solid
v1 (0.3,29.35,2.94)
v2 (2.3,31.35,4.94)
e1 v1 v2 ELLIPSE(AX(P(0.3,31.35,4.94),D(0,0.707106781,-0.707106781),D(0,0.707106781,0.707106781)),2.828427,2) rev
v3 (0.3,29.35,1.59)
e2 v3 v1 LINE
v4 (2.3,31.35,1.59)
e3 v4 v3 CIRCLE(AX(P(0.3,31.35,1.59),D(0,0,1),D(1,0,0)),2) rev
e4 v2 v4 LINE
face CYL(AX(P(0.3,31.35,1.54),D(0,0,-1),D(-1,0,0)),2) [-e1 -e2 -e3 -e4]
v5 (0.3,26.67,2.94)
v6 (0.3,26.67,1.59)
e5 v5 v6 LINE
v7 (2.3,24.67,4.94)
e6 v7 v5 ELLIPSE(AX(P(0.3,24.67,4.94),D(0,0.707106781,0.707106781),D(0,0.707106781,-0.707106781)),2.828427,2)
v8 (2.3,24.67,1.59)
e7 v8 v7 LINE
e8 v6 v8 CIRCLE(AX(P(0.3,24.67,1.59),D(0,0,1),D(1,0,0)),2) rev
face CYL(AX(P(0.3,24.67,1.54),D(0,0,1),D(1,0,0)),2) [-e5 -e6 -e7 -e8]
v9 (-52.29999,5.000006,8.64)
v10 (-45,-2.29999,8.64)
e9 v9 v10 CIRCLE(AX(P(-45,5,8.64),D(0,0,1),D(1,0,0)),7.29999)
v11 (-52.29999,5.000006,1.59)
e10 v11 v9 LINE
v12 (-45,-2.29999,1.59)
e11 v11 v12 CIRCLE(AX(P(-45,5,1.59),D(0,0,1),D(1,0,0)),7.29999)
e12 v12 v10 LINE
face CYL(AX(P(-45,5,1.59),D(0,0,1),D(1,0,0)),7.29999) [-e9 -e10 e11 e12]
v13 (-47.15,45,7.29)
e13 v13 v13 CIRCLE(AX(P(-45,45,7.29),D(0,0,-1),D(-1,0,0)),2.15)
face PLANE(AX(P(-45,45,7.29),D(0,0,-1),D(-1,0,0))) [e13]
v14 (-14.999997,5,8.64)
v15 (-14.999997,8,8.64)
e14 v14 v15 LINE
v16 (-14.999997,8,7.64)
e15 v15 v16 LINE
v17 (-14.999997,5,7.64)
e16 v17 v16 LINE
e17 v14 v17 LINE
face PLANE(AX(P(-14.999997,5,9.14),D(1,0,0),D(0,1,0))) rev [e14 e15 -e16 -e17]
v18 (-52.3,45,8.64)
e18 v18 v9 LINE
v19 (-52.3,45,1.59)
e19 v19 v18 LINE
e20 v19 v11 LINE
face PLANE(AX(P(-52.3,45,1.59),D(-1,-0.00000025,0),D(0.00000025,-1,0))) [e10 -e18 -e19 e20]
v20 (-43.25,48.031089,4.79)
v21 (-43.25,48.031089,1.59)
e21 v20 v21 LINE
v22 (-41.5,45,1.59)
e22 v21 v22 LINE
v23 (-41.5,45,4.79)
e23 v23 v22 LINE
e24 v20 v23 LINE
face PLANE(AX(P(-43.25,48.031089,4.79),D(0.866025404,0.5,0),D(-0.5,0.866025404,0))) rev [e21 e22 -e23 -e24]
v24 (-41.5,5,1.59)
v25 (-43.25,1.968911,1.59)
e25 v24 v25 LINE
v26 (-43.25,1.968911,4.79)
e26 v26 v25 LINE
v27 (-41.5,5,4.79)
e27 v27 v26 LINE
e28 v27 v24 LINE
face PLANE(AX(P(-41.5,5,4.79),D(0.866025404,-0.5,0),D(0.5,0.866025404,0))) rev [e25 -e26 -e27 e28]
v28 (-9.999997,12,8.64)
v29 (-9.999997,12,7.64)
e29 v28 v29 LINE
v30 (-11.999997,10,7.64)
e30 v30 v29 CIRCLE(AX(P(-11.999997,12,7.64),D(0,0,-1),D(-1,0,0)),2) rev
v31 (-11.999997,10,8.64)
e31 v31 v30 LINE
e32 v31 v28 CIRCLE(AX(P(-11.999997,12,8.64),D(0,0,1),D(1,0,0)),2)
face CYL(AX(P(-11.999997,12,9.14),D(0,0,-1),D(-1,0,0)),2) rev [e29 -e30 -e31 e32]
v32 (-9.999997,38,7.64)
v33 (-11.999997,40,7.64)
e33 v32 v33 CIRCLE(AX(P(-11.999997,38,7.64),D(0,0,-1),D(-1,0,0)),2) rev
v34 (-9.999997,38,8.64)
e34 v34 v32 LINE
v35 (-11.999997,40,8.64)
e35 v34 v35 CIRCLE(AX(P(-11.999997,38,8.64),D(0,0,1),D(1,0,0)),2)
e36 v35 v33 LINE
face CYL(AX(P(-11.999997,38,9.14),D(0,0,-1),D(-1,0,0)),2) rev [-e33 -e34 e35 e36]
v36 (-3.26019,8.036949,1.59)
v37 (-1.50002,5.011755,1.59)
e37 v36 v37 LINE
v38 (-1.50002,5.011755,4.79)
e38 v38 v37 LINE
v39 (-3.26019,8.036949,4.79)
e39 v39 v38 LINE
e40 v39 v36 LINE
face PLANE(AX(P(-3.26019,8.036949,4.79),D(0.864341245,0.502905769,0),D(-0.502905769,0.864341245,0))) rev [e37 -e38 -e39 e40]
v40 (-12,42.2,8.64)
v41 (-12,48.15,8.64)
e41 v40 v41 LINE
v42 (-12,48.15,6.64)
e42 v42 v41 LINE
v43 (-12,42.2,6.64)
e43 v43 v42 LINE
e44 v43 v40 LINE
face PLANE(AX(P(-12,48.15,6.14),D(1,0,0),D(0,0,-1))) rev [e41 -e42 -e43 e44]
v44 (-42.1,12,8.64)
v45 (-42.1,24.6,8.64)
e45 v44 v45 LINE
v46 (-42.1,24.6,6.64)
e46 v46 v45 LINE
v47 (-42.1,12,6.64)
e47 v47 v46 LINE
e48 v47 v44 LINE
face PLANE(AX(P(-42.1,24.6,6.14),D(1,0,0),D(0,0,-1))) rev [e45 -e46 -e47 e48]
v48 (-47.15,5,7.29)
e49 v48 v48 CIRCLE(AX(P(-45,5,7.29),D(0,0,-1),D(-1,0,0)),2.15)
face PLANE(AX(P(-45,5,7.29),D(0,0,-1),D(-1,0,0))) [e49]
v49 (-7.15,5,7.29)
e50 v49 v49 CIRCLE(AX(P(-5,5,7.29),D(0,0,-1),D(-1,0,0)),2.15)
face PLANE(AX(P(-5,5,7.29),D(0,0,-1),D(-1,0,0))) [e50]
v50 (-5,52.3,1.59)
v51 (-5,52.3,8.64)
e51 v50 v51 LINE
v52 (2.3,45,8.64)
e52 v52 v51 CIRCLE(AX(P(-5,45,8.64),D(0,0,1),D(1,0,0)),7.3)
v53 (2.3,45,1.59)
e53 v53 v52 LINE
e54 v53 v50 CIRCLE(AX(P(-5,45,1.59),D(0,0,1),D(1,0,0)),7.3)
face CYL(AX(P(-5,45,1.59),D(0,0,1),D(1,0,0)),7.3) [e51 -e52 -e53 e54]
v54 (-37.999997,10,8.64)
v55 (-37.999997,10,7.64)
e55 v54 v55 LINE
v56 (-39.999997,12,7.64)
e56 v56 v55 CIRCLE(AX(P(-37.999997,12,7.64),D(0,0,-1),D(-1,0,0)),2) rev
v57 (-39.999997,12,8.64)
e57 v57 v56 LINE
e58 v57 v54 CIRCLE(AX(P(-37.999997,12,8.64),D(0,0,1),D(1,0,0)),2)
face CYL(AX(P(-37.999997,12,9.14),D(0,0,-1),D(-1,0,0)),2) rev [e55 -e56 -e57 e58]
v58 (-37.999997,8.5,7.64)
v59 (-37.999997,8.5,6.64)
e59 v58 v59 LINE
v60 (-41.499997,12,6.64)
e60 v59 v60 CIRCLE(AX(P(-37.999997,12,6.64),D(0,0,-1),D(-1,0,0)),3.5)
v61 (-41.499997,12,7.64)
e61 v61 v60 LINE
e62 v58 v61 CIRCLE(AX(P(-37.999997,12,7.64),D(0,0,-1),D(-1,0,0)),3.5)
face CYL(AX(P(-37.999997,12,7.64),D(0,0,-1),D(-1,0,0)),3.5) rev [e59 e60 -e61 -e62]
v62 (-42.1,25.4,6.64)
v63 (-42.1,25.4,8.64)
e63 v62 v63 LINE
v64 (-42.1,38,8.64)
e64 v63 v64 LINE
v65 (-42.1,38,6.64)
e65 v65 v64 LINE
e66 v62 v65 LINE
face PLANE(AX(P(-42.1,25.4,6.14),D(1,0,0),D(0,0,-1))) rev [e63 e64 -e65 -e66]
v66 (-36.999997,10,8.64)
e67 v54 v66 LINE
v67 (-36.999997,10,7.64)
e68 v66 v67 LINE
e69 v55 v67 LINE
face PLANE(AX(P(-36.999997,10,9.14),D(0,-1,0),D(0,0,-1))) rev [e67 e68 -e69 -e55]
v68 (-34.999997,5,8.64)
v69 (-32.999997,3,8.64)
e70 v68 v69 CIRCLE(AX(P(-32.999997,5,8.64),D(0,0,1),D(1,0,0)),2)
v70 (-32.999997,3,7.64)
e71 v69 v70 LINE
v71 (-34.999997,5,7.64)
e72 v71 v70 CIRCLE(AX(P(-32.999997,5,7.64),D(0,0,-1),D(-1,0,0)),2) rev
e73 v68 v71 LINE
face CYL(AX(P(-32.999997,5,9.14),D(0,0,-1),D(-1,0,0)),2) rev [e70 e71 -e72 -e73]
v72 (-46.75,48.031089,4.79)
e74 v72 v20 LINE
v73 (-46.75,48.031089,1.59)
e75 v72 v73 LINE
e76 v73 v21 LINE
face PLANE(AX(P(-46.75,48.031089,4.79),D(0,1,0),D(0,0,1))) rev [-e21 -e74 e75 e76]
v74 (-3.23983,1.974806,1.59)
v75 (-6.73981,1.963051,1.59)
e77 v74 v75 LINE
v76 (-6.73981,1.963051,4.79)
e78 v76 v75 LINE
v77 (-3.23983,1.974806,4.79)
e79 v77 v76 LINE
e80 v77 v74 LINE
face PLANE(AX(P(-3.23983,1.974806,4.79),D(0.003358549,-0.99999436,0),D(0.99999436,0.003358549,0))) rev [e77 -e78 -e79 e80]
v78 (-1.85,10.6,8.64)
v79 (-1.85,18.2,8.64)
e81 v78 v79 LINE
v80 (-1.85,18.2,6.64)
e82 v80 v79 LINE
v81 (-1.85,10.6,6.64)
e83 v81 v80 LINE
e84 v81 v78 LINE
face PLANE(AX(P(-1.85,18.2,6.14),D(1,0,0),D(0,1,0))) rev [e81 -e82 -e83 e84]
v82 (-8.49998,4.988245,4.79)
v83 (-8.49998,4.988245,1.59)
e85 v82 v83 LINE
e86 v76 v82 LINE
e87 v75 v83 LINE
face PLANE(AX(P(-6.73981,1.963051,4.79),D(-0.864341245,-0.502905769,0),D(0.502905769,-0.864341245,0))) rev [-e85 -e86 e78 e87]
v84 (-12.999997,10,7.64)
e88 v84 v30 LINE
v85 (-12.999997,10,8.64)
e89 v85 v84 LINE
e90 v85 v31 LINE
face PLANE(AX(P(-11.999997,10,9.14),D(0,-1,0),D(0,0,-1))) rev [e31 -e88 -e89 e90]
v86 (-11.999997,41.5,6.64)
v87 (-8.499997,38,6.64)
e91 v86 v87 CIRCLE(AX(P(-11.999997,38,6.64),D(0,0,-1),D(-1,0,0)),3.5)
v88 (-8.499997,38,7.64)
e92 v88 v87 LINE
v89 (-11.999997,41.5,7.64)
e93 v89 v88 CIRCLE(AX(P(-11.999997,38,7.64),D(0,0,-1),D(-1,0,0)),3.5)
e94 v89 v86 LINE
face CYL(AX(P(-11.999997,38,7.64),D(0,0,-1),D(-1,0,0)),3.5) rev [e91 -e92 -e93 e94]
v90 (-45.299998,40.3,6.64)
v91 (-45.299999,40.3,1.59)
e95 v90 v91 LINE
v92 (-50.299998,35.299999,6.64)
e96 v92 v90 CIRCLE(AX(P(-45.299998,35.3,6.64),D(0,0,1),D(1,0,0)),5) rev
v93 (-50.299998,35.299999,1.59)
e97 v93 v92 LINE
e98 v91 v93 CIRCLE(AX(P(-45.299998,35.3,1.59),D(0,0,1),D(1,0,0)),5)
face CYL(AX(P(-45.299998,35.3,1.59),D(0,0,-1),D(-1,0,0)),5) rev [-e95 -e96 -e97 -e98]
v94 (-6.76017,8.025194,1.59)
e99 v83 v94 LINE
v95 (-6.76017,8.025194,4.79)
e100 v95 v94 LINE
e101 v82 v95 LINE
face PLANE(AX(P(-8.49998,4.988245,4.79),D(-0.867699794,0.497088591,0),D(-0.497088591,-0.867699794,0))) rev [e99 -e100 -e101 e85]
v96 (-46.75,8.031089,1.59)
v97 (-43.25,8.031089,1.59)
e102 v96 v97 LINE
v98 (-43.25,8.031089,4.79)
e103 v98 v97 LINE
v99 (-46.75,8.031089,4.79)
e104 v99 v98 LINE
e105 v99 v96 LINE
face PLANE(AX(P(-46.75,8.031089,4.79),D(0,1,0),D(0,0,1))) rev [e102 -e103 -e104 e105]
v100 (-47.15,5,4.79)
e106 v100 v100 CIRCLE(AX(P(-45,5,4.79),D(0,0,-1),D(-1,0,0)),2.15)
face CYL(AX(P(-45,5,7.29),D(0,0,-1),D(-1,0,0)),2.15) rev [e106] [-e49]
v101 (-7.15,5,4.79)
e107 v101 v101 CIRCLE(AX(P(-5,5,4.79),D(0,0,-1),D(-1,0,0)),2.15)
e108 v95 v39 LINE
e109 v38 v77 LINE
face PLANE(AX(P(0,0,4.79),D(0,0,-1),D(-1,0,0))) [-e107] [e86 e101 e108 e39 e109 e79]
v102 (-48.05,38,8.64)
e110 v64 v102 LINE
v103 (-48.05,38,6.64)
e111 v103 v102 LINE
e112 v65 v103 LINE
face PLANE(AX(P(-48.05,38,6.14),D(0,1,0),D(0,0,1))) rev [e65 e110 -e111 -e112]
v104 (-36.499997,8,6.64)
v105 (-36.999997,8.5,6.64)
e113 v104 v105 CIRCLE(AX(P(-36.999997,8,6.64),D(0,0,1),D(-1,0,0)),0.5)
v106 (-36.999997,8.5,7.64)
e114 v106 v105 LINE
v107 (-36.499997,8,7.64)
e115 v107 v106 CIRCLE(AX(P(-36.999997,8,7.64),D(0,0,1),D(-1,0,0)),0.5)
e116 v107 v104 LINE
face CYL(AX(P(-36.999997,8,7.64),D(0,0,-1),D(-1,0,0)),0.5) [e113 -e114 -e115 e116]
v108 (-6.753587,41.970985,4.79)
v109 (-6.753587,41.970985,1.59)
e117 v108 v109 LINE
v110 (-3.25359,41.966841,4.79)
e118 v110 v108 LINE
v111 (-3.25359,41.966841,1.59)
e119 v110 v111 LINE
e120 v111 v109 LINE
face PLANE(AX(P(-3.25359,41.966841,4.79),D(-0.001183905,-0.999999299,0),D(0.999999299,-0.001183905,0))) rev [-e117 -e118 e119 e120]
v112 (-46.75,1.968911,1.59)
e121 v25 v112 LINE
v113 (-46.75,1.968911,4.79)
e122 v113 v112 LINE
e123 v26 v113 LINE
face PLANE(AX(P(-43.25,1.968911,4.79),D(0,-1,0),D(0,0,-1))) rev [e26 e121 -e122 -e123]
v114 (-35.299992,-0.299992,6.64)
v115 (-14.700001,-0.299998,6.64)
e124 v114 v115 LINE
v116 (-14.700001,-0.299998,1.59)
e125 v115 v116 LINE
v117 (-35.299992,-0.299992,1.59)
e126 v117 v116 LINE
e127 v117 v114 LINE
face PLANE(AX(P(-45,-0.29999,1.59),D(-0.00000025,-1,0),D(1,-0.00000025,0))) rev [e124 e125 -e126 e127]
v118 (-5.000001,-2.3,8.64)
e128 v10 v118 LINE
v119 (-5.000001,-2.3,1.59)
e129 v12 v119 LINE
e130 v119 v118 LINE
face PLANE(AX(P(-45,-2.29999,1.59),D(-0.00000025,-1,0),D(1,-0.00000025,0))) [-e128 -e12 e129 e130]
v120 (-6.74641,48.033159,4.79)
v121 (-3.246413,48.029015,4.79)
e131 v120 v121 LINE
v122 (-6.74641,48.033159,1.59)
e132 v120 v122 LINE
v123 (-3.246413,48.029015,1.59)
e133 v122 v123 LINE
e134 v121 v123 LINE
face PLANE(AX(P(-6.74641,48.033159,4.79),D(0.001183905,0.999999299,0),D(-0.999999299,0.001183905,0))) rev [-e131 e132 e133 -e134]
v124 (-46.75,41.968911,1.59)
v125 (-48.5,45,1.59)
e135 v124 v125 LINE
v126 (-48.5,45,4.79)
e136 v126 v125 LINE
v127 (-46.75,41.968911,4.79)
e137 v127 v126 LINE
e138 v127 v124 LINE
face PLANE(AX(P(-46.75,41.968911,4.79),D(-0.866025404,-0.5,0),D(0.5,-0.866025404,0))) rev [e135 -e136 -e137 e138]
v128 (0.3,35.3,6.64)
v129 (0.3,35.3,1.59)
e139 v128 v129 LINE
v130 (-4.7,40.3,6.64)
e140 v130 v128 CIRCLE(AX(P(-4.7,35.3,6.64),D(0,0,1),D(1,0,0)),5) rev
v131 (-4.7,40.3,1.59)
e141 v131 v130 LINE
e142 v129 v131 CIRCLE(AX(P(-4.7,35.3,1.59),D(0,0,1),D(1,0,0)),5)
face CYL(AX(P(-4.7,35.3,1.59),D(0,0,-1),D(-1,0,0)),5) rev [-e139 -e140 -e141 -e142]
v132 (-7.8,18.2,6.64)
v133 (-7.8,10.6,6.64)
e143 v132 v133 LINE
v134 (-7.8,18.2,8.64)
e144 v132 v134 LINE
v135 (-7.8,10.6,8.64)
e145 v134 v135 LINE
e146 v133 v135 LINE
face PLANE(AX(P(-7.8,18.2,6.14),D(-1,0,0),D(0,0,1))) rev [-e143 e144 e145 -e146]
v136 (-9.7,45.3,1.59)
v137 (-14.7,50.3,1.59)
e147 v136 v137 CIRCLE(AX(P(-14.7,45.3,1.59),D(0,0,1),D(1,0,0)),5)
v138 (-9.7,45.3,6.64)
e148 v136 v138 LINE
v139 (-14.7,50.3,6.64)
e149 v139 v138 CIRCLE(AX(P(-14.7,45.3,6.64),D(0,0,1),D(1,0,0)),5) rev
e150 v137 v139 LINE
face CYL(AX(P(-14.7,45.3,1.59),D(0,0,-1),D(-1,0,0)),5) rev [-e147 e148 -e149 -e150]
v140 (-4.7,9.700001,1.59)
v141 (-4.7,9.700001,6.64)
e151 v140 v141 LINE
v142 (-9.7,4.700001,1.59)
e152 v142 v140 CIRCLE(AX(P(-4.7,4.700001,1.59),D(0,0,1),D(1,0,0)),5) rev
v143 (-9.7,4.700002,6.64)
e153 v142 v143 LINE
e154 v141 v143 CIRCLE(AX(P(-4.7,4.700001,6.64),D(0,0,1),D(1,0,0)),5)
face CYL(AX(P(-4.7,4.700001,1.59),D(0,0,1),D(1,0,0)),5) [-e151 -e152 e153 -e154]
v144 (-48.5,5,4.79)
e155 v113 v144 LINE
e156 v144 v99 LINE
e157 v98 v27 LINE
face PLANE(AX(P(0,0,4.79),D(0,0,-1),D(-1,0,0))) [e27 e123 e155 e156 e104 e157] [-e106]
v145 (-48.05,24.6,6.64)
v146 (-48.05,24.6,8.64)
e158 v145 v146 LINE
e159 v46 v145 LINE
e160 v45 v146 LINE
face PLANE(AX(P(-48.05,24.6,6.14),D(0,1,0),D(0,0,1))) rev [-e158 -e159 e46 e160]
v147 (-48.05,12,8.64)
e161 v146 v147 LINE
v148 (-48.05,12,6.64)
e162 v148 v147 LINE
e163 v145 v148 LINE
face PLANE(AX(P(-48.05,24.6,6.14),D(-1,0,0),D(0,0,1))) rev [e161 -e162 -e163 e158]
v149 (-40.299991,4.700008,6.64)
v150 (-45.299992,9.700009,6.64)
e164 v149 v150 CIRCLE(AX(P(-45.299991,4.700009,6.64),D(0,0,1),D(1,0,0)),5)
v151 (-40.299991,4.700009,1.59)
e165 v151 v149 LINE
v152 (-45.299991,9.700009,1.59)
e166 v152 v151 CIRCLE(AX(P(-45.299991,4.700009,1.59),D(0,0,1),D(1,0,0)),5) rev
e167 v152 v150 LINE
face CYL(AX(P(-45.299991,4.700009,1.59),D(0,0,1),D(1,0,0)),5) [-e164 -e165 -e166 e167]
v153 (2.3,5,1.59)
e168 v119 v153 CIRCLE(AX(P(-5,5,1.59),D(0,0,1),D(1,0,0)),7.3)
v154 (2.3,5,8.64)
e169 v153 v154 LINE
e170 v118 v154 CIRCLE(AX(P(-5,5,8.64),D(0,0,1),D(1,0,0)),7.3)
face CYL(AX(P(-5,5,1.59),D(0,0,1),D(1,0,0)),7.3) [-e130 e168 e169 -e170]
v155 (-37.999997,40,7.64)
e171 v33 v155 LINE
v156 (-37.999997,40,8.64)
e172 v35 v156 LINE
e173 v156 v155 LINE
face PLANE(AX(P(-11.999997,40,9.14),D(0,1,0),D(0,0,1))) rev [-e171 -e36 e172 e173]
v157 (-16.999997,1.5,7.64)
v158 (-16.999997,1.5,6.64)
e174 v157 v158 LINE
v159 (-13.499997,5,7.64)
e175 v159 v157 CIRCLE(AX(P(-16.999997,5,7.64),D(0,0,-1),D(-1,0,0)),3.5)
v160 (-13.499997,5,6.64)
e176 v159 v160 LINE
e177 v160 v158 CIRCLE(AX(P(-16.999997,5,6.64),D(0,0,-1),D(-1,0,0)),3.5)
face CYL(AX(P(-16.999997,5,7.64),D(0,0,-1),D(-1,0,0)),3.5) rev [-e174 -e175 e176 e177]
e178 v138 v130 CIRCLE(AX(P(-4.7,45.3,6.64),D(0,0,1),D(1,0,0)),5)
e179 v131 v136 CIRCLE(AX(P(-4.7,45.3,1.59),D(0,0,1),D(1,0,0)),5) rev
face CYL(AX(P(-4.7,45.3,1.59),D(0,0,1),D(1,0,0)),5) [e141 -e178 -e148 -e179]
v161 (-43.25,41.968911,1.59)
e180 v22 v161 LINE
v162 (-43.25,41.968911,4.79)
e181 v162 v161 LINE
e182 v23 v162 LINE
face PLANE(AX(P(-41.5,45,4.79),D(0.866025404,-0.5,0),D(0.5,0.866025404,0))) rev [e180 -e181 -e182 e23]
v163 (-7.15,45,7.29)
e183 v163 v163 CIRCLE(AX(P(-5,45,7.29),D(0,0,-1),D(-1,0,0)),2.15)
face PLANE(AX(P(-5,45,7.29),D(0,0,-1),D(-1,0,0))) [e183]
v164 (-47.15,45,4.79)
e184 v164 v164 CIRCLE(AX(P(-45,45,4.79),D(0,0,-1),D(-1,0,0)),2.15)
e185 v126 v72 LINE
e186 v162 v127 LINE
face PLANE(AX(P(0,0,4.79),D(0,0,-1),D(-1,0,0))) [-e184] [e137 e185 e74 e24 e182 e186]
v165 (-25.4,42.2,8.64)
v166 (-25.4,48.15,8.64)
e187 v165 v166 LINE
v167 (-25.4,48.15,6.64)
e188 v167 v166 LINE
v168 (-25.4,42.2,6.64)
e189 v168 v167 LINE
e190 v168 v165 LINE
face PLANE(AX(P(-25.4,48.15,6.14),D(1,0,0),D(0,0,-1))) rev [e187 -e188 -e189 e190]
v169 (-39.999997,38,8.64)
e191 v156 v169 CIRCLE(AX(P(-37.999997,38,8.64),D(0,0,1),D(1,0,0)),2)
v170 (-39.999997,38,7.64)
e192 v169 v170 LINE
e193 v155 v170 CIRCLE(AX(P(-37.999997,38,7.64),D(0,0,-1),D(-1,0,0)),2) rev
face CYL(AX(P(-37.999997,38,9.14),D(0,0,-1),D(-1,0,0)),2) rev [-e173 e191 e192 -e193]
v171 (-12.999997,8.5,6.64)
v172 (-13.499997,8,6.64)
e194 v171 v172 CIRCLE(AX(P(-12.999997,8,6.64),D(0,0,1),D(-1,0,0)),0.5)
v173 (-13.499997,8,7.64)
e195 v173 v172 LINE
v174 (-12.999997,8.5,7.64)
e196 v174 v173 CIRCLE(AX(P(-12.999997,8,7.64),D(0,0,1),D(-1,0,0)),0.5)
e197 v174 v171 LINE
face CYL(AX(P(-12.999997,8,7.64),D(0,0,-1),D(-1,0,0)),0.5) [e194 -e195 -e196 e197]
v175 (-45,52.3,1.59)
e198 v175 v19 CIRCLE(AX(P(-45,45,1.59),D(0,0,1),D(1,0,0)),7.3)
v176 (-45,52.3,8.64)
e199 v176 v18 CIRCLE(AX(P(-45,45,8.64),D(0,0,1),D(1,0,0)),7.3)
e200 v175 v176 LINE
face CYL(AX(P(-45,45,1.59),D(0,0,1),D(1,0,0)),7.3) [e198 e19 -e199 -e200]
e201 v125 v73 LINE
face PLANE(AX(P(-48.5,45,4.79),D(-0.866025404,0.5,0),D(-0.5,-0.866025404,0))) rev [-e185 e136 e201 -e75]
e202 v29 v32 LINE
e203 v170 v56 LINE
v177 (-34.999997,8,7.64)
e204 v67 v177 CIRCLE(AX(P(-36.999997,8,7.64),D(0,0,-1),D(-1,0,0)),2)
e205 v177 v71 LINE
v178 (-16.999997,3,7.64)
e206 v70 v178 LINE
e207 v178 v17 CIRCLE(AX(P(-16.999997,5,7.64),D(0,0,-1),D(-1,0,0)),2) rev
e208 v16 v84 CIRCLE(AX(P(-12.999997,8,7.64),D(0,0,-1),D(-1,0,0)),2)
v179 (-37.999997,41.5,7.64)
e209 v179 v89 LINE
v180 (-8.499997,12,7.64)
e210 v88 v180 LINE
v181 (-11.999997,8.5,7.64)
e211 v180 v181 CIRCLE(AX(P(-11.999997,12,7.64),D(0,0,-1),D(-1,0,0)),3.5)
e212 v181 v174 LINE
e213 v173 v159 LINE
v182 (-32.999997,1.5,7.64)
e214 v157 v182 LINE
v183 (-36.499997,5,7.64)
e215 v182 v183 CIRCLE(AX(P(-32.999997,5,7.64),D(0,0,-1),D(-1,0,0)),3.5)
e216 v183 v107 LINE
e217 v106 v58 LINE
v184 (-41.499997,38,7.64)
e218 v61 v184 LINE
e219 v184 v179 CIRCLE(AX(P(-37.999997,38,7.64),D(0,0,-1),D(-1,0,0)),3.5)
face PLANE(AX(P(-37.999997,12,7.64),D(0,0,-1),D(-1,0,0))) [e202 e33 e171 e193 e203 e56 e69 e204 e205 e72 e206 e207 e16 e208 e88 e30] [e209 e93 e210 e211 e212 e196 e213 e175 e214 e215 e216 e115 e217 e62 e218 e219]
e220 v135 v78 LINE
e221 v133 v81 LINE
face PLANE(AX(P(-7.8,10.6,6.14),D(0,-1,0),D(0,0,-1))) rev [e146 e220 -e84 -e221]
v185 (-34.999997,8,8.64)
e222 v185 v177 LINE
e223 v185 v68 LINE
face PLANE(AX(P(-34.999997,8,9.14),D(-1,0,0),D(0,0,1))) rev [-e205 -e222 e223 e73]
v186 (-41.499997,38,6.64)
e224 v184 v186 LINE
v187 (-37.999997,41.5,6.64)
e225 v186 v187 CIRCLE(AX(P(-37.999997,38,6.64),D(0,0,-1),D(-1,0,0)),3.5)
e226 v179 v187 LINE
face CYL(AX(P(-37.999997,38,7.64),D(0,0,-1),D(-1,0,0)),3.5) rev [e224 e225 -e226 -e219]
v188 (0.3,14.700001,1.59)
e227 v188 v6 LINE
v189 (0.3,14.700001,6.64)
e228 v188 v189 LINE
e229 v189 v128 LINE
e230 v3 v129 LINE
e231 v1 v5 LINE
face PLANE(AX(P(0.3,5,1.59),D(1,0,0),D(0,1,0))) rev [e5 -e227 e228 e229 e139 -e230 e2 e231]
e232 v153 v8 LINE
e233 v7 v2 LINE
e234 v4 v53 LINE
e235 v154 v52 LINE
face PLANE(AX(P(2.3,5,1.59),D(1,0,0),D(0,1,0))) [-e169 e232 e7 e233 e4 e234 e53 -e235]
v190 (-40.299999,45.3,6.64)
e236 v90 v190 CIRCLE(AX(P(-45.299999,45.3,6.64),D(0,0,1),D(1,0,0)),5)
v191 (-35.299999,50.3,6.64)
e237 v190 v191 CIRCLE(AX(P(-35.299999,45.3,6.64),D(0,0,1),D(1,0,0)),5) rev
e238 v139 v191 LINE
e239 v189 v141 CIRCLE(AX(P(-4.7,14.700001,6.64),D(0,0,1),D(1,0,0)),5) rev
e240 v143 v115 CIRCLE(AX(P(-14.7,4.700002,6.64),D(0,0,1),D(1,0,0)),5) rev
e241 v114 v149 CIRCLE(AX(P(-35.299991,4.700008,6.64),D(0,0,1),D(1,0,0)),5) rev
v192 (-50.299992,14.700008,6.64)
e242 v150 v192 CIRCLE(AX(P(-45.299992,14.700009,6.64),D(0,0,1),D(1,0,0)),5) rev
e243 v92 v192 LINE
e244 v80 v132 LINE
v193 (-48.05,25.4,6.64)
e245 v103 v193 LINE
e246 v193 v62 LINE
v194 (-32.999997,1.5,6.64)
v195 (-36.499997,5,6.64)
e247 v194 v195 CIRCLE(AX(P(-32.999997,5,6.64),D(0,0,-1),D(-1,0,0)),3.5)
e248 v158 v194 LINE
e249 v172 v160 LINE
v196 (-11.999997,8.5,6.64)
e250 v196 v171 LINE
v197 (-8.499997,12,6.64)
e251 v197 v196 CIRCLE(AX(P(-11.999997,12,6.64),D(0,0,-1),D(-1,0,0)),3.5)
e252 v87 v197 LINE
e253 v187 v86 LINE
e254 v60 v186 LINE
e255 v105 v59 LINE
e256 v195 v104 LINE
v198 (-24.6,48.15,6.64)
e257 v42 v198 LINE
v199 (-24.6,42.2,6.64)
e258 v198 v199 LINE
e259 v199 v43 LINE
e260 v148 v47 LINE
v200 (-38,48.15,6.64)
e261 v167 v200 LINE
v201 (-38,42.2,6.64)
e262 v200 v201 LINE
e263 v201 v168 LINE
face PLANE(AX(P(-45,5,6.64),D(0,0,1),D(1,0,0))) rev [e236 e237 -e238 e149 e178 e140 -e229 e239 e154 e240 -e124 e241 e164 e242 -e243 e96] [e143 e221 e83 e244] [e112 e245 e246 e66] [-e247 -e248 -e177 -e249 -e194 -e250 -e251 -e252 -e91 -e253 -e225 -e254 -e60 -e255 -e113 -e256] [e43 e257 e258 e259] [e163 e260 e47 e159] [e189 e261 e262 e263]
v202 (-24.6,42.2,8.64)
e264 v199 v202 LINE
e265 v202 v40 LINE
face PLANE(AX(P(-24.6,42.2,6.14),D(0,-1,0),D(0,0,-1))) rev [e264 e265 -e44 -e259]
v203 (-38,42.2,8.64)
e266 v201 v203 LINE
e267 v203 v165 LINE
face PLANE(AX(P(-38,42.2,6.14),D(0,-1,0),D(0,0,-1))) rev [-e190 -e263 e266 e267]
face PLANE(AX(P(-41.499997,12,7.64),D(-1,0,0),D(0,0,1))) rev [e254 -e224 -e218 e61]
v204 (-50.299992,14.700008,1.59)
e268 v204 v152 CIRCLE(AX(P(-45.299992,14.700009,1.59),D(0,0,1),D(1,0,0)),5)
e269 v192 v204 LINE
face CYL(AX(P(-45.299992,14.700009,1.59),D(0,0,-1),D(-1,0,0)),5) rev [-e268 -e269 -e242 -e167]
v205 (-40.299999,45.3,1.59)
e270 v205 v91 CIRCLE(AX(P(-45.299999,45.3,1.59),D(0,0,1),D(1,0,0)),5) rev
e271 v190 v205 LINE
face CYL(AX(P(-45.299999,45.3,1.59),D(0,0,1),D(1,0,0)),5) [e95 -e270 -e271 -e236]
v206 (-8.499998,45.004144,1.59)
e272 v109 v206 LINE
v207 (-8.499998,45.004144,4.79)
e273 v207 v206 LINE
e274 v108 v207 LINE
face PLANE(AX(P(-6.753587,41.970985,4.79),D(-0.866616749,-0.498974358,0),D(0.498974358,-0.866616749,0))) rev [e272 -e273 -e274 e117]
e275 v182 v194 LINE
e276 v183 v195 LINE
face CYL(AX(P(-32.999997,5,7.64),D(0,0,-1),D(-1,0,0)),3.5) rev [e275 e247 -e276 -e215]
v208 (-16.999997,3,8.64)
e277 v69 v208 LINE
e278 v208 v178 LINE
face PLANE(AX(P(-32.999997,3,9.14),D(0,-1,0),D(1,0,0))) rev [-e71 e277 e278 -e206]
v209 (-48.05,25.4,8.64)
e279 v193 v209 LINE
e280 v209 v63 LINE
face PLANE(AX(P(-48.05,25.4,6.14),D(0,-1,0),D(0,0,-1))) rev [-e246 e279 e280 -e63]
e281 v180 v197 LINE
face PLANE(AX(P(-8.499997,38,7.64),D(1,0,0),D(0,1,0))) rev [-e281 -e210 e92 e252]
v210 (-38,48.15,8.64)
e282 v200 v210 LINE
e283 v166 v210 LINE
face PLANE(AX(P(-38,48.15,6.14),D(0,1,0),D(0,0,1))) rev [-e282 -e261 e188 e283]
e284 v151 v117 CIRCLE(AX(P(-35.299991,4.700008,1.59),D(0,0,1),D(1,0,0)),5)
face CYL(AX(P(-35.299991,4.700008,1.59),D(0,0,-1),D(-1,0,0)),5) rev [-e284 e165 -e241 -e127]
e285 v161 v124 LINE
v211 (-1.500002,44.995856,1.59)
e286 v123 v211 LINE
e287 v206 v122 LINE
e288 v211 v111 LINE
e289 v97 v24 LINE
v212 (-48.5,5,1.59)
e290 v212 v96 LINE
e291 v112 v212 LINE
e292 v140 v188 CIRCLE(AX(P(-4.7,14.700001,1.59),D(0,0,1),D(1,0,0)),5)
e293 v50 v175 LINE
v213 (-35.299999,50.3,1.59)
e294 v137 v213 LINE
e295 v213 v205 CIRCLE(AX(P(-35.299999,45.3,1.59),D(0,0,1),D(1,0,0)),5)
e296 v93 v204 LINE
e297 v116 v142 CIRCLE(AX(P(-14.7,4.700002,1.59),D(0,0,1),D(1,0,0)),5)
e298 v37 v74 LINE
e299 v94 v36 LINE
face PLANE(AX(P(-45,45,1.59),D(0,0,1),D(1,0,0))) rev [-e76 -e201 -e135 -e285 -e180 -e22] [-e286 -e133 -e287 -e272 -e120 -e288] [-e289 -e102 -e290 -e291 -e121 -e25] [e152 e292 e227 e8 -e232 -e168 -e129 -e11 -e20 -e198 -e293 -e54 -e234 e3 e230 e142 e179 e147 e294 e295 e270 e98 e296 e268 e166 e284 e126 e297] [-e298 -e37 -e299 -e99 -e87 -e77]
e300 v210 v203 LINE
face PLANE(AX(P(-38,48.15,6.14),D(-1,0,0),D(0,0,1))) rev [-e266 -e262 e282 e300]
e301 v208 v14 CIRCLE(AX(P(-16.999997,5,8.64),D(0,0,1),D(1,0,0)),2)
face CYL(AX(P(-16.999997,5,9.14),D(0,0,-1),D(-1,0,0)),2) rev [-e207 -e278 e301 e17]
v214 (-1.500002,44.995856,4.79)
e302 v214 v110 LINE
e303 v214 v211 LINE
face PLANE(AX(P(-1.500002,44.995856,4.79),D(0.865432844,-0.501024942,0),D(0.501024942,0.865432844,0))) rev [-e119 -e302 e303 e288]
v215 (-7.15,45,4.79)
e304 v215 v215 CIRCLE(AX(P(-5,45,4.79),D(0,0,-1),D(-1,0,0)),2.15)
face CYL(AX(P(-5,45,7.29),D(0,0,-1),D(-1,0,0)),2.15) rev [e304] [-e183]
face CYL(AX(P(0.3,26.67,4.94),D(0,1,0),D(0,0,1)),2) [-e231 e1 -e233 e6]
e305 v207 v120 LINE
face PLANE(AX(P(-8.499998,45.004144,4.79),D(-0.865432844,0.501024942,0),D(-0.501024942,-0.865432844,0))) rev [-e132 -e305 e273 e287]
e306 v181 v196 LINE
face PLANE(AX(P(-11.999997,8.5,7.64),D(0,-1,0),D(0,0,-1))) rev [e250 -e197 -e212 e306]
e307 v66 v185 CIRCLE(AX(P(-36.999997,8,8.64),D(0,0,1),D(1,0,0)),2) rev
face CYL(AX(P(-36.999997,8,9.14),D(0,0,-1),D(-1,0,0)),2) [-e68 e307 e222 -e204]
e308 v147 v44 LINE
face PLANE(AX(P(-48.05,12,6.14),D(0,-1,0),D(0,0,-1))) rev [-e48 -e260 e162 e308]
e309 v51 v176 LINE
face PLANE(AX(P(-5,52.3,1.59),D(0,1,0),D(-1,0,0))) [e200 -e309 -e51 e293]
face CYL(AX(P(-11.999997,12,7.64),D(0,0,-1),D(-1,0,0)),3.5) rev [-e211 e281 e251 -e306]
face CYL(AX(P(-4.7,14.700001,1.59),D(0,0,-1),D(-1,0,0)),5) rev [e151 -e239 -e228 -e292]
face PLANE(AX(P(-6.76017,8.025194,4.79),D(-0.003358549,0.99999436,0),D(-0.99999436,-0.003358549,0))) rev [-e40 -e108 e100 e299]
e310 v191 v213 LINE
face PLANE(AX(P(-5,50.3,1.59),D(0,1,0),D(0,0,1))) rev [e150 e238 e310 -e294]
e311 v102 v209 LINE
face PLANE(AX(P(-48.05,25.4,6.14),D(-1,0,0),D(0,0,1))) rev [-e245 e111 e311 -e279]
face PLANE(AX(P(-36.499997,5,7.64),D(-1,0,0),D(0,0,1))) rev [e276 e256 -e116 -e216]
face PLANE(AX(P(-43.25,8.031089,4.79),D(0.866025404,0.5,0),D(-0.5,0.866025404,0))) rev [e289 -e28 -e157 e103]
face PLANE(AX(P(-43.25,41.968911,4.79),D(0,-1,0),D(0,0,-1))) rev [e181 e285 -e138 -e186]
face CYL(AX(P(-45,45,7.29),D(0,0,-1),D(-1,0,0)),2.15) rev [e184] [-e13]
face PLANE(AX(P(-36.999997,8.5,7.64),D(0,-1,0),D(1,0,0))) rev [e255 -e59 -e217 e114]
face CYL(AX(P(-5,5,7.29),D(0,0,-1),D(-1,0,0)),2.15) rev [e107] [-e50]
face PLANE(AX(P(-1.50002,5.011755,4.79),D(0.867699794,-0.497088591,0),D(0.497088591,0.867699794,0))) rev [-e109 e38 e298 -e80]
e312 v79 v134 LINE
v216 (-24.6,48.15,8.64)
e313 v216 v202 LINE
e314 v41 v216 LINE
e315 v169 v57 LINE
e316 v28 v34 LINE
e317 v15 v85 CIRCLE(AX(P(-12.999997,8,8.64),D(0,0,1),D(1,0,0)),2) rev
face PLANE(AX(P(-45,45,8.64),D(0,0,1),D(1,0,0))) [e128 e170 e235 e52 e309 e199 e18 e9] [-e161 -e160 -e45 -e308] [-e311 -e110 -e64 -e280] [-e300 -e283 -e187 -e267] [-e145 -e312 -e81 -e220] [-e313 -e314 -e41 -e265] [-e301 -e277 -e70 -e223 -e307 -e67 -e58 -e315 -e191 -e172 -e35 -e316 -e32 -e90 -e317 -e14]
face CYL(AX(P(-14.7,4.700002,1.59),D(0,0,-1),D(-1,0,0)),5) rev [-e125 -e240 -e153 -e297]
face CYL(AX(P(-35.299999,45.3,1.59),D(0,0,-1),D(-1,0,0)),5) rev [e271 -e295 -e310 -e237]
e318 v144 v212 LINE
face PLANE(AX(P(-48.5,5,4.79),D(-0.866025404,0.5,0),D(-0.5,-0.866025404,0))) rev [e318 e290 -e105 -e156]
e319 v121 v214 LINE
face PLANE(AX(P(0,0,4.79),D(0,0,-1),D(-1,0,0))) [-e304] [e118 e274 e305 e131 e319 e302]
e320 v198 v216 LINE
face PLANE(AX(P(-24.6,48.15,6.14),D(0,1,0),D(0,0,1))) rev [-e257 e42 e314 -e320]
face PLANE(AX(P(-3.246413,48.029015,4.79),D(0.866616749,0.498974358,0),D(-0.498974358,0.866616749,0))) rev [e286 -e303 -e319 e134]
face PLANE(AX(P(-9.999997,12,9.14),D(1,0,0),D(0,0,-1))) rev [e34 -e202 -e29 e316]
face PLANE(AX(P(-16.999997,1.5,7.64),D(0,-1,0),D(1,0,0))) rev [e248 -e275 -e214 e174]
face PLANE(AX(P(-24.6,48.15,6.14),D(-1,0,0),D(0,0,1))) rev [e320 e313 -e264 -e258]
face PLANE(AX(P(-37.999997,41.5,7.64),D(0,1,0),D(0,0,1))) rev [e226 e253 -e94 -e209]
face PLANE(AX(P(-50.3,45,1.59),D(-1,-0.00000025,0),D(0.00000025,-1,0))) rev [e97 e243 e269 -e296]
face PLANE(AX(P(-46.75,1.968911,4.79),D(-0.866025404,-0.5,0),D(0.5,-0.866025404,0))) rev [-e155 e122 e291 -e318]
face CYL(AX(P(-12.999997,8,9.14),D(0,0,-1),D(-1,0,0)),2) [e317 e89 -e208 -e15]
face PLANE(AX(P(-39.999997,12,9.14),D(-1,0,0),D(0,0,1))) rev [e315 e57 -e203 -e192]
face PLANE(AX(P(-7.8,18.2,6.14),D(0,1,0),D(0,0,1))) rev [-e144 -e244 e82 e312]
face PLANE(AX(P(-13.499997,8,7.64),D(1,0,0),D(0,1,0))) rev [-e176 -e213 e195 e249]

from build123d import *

# Parameters (mm, degrees)
WALL_EXTRUDE_BOSS_START          = 8.64
WALL_EXTRUDE_BOSS_DEPTH          = 7.05
CEILING_EXTRUDE_BOSS_DEPTH       = 2
SCREWS_BLOCKS_EXTRUDE_BOSS_DEPTH = 5.05
SCREWS_BLOCKS_FILLET_R           = 5
NUTS_EXTRUDE_DEPTH               = 3.2
SCREWS_SKETCH_R                  = 2.15
SCREWS_HOOLES_EXTRUDE_DEPTH      = 2.5
CONNECTORS_SKETCH_W              = 12.6
CONNECTORS_SKETCH_H              = 5.95
CONNECTORS_SKETCH_W_2            = 5.95
CONNECTORS_SKETCH_H_2            = 12.6
CONNECTORS_SKETCH_H_3            = 7.6
CONNECTORS_EXTRUDE_DEPTH         = 2.5
SWITCH_SKETCH_W                  = 1.4
SWITCH_SKETCH_H                  = 2.68
SWITCH_EXTRUDE_DEPTH             = 2.5
SWITCH_FILLET_R                  = 2
GLASS_EXTRUDE_DEPTH              = 2.5
GLASS_FIT_EXTRUDE_DEPTH          = 1


with BuildPart() as part:
    # Wall_Sketch → Wall_Extrude_Boss (new body)
    with BuildSketch(Plane.XY.offset(WALL_EXTRUDE_BOSS_START)):
        with BuildLine():
            Line((-52.3, 44.999999897), (-52.29999, 5.00000605))
            ThreePointArc((-52.29999, 5.00000605), (-50.161874571, -0.161870293), (-45, -2.29999))
            Line((-45, -2.29999), (-5.000000575, -2.3))
            ThreePointArc((-5.000000575, -2.3), (0.161879299, -0.161879706), (2.3, 5))
            Line((2.3, 5), (2.3, 45))
            ThreePointArc((2.3, 45), (0.161879503, 50.161879503), (-5, 52.3))
            Line((-5, 52.3), (-45, 52.3))
            ThreePointArc((-45, 52.3), (-50.161879539, 50.161879466), (-52.3, 44.999999897))
        make_face()
        with BuildLine():
            Line((-5, 50.3), (-45, 50.3))
            ThreePointArc((-45, 50.3), (-48.747665967, 48.747665914), (-50.3, 44.999999925))
            Line((-50.3, 44.999999925), (-50.29999, 5.00000655))
            ThreePointArc((-50.29999, 5.00000655), (-48.747661185, 1.252343447), (-45, -0.29999))
            Line((-45, -0.29999), (-5.000000075, -0.3))
            ThreePointArc((-5.000000075, -0.3), (-1.252334086, 1.252334033), (0.3, 5))
            Line((0.3, 5), (0.3, 45))
            ThreePointArc((0.3, 45), (-1.25233406, 48.74766594), (-5, 50.3))
        make_face(mode=Mode.SUBTRACT)
    extrude(amount=-WALL_EXTRUDE_BOSS_DEPTH)

    # Ceiling_Sketch → Ceiling_Extrude_Boss (add)
    with BuildSketch(Plane.XY.offset(8.64)):
        with BuildLine():
            Line((-45, -0.29999), (-5.000000075, -0.3))
            ThreePointArc((-5.000000075, -0.3), (-1.252334086, 1.252334033), (0.3, 5))
            Line((0.3, 5), (0.3, 45))
            ThreePointArc((0.3, 45), (-1.25233406, 48.74766594), (-5, 50.3))
            Line((-5, 50.3), (-45, 50.3))
            ThreePointArc((-45, 50.3), (-48.747665967, 48.747665914), (-50.3, 44.999999925))
            Line((-50.3, 44.999999925), (-50.29999, 5.00000655))
            ThreePointArc((-50.29999, 5.00000655), (-48.747661185, 1.252343447), (-45, -0.29999))
        make_face()
    extrude(amount=-CEILING_EXTRUDE_BOSS_DEPTH)


with BuildPart() as screws_blocks_extrude_boss_tool:
    # Screws_Blocks_Sketch → Screws_Blocks_Extrude_Boss (new body)
    with BuildSketch(Plane(origin=(0, 0, 6.64), x_dir=(-1, 0, 0), z_dir=(0, 0, -1))):
        with BuildLine():
            Line((9.7, -0.299998825), (4.7, -0.299998825))
            ThreePointArc((4.7, -0.299998825), (1.164466094, 1.164467269), (-0.3, 4.700001175))
            Line((-0.3, 4.700001175), (-0.3, 9.700001175))
            Line((-0.3, 9.700001175), (9.7, 9.700001175))
            Line((9.7, 9.700001175), (9.7, -0.299998825))
        make_face()
        with BuildLine():
            Line((9.7, 50.3), (4.7, 50.3))
            ThreePointArc((4.7, 50.3), (1.164466094, 48.835533906), (-0.3, 45.3))
            Line((-0.3, 45.3), (-0.3, 40.3))
            Line((-0.3, 40.3), (9.7, 40.3))
            Line((9.7, 40.3), (9.7, 50.3))
        make_face()
        with BuildLine():
            Line((40.299998825, 50.3), (45.299998825, 50.3))
            ThreePointArc((45.299998825, 50.3), (48.835532731, 48.835533906), (50.299998825, 45.3))
            Line((50.299998825, 45.3), (50.299998825, 40.3))
            Line((50.299998825, 40.3), (40.299998825, 40.3))
            Line((40.299998825, 40.3), (40.299998825, 50.3))
        make_face()
        with BuildLine():
            Line((40.299991175, -0.299991175), (45.299991175, -0.299991175))
            ThreePointArc((45.299991175, -0.299991175), (48.835525081, 1.164474919), (50.299991175, 4.700008825))
            Line((50.299991175, 4.700008825), (50.299991175, 9.700008825))
            Line((50.299991175, 9.700008825), (40.299991175, 9.700008825))
            Line((40.299991175, 9.700008825), (40.299991175, -0.299991175))
        make_face()
    extrude(amount=SCREWS_BLOCKS_EXTRUDE_BOSS_DEPTH)


with BuildPart() as part_1:
    add(part.part)


with BuildPart() as part_2:
    # Screws_Blocks_Extrude_Boss: joined with screws_blocks_extrude_boss_tool
    add(part_1.part.fuse(screws_blocks_extrude_boss_tool.part, tol=0.00001))

    # Screws_Blocks_Fillet
    screws_blocks_fillet_edges = [part_2.edges().sort_by_distance(p)[0] for p in [
        (-40.299998825, 50.3, 4.115),
        (-50.299998825, 40.3, 4.115),
        (-40.299998825, 40.3, 4.115),
        (-9.7, 50.3, 4.115),
        (-9.7, 40.3, 4.115),
        (0.3, 40.3, 4.115),
        (0.3, 9.700001175, 4.115),
        (-9.7, 9.700001175, 4.115),
        (-9.7, -0.299998825, 4.115),
        (-40.299991175, -0.299991175, 4.115),
        (-40.299991175, 9.700008825, 4.115),
        (-50.299991175, 9.700008825, 4.115),
    ]]
    fillet(screws_blocks_fillet_edges, radius=SCREWS_BLOCKS_FILLET_R - 0.0001)  # a hair under: the kernel refuses the full size

    # Nuts_Sketch → Nuts_Extrude (cut)
    with BuildSketch(Plane(origin=(0, 0, 1.59), x_dir=(-1, 0, 0), z_dir=(0, 0, -1))):
        Polygon((1.500002453, 44.995856332), (3.253589748, 41.966841377), (6.753587296, 41.970985045), (8.499997547, 45.004143668), (6.746410252, 48.033158623), (3.246412704, 48.029014955), align=None)
        Polygon((41.5, 45), (43.25, 41.968911087), (46.75, 41.968911087), (48.5, 45), (46.75, 48.031088913), (43.25, 48.031088913), align=None)
        Polygon((41.5, 5), (43.25, 1.968911087), (46.75, 1.968911087), (48.5, 5), (46.75, 8.031088913), (43.25, 8.031088913), align=None)
        Polygon((8.49998026, 4.988245077), (6.760170192, 8.025194356), (3.260189932, 8.03694928), (1.50001974, 5.011754923), (3.239829808, 1.974805644), (6.739810068, 1.96305072), align=None)
    extrude(amount=-NUTS_EXTRUDE_DEPTH, mode=Mode.SUBTRACT)

    # Screws_Sketch → Screws_Hooles_Extrude (cut)
    with BuildSketch(Plane(origin=(0, 0, 4.79), x_dir=(-1, 0, 0), z_dir=(0, 0, -1))):
        with Locations((5, 45)):
            Circle(SCREWS_SKETCH_R)
        with Locations((45, 45)):
            Circle(SCREWS_SKETCH_R)
        with Locations((45, 5)):
            Circle(SCREWS_SKETCH_R)
        with Locations((5, 5)):
            Circle(SCREWS_SKETCH_R)
    extrude(amount=-SCREWS_HOOLES_EXTRUDE_DEPTH, mode=Mode.SUBTRACT)

    # Connectors_Sketch → Connectors_Extrude (cut)
    with BuildSketch(Plane.XY.offset(8.64)):
        with Locations((-31.7, 45.175)):
            Rectangle(CONNECTORS_SKETCH_W, CONNECTORS_SKETCH_H)
        with Locations((-18.3, 45.175)):
            Rectangle(CONNECTORS_SKETCH_W, CONNECTORS_SKETCH_H)
        with Locations((-45.075, 31.7)):
            Rectangle(CONNECTORS_SKETCH_W_2, CONNECTORS_SKETCH_H_2)
        with Locations((-45.075, 18.3)):
            Rectangle(CONNECTORS_SKETCH_W_2, CONNECTORS_SKETCH_H_2)
        with Locations((-4.825, 14.4)):
            Rectangle(CONNECTORS_SKETCH_W_2, CONNECTORS_SKETCH_H_3)
    extrude(amount=-CONNECTORS_EXTRUDE_DEPTH, mode=Mode.SUBTRACT)

    # Switch_Sketch → Switch_Extrude (cut)
    with BuildSketch(Plane(origin=(2.3, 0, 0), x_dir=(0, 0, -1), z_dir=(1, 0, 0))):
        with Locations((-2.24, 28.01)):
            Rectangle(SWITCH_SKETCH_W, SWITCH_SKETCH_H)
    extrude(amount=-SWITCH_EXTRUDE_DEPTH, mode=Mode.SUBTRACT)

    # Switch_Fillet
    switch_fillet_edges = [part_2.edges().sort_by_distance(p)[0] for p in [
        (2.3, 28.01, 2.94),
        (2.3, 29.35, 2.265),
        (2.3, 26.67, 2.265),
    ]]
    fillet(switch_fillet_edges, radius=SWITCH_FILLET_R - 0.0001)  # a hair under: the kernel refuses the full size

    # Glass_Sketch → Glass_Extrude (cut)
    with BuildSketch(Plane(origin=(0, 0, 6.64), x_dir=(-1, 0, 0), z_dir=(0, 0, -1))):
        with BuildLine():
            Line((34.9999975, 8), (34.9999975, 5))
            ThreePointArc((34.9999975, 5), (34.414211062, 3.585786438), (32.9999975, 3))
            Line((32.9999975, 3), (16.9999975, 3))
            ThreePointArc((16.9999975, 3), (15.585783938, 3.585786438), (14.9999975, 5))
            Line((14.9999975, 5), (14.9999975, 8))
            ThreePointArc((14.9999975, 8), (14.414211062, 9.414213562), (12.9999975, 10))
            Line((12.9999975, 10), (11.9999975, 10))
            ThreePointArc((11.9999975, 10), (10.585783938, 10.585786438), (9.9999975, 12))
            Line((9.9999975, 12), (9.9999975, 38))
            ThreePointArc((9.9999975, 38), (10.585783938, 39.414213562), (11.9999975, 40))
            Line((11.9999975, 40), (37.9999975, 40))
            ThreePointArc((37.9999975, 40), (39.414211062, 39.414213562), (39.9999975, 38))
            Line((39.9999975, 38), (39.9999975, 12))
            ThreePointArc((39.9999975, 12), (39.414211062, 10.585786438), (37.9999975, 10))
            Line((37.9999975, 10), (36.9999975, 10))
            ThreePointArc((36.9999975, 10), (35.585783938, 9.414213562), (34.9999975, 8))
        make_face()
    extrude(amount=-GLASS_EXTRUDE_DEPTH, mode=Mode.SUBTRACT)

    # Glass_Fit_Sketch → Glass_Fit_Extrude (cut)
    with BuildSketch(Plane(origin=(0, 0, 6.64), x_dir=(-1, 0, 0), z_dir=(0, 0, -1))):
        with BuildLine():
            Line((36.9999975, 8.5), (37.9999975, 8.5))
            ThreePointArc((37.9999975, 8.5), (40.474871234, 9.525126266), (41.4999975, 12))
            Line((41.4999975, 12), (41.4999975, 38))
            ThreePointArc((41.4999975, 38), (40.474871234, 40.474873734), (37.9999975, 41.5))
            Line((37.9999975, 41.5), (11.9999975, 41.5))
            ThreePointArc((11.9999975, 41.5), (9.525123766, 40.474873734), (8.4999975, 38))
            Line((8.4999975, 38), (8.4999975, 12))
            ThreePointArc((8.4999975, 12), (9.525123766, 9.525126266), (11.9999975, 8.5))
            Line((11.9999975, 8.5), (12.9999975, 8.5))
            ThreePointArc((12.9999975, 8.5), (13.353550891, 8.353553391), (13.4999975, 8))
            Line((13.4999975, 8), (13.4999975, 5))
            ThreePointArc((13.4999975, 5), (14.525123766, 2.525126266), (16.9999975, 1.5))
            Line((16.9999975, 1.5), (32.9999975, 1.5))
            ThreePointArc((32.9999975, 1.5), (35.474871234, 2.525126266), (36.4999975, 5))
            Line((36.4999975, 5), (36.4999975, 8))
            ThreePointArc((36.4999975, 8), (36.646444109, 8.353553391), (36.9999975, 8.5))
        make_face()
    extrude(amount=-GLASS_FIT_EXTRUDE_DEPTH, mode=Mode.SUBTRACT)


solid = part_2.part
